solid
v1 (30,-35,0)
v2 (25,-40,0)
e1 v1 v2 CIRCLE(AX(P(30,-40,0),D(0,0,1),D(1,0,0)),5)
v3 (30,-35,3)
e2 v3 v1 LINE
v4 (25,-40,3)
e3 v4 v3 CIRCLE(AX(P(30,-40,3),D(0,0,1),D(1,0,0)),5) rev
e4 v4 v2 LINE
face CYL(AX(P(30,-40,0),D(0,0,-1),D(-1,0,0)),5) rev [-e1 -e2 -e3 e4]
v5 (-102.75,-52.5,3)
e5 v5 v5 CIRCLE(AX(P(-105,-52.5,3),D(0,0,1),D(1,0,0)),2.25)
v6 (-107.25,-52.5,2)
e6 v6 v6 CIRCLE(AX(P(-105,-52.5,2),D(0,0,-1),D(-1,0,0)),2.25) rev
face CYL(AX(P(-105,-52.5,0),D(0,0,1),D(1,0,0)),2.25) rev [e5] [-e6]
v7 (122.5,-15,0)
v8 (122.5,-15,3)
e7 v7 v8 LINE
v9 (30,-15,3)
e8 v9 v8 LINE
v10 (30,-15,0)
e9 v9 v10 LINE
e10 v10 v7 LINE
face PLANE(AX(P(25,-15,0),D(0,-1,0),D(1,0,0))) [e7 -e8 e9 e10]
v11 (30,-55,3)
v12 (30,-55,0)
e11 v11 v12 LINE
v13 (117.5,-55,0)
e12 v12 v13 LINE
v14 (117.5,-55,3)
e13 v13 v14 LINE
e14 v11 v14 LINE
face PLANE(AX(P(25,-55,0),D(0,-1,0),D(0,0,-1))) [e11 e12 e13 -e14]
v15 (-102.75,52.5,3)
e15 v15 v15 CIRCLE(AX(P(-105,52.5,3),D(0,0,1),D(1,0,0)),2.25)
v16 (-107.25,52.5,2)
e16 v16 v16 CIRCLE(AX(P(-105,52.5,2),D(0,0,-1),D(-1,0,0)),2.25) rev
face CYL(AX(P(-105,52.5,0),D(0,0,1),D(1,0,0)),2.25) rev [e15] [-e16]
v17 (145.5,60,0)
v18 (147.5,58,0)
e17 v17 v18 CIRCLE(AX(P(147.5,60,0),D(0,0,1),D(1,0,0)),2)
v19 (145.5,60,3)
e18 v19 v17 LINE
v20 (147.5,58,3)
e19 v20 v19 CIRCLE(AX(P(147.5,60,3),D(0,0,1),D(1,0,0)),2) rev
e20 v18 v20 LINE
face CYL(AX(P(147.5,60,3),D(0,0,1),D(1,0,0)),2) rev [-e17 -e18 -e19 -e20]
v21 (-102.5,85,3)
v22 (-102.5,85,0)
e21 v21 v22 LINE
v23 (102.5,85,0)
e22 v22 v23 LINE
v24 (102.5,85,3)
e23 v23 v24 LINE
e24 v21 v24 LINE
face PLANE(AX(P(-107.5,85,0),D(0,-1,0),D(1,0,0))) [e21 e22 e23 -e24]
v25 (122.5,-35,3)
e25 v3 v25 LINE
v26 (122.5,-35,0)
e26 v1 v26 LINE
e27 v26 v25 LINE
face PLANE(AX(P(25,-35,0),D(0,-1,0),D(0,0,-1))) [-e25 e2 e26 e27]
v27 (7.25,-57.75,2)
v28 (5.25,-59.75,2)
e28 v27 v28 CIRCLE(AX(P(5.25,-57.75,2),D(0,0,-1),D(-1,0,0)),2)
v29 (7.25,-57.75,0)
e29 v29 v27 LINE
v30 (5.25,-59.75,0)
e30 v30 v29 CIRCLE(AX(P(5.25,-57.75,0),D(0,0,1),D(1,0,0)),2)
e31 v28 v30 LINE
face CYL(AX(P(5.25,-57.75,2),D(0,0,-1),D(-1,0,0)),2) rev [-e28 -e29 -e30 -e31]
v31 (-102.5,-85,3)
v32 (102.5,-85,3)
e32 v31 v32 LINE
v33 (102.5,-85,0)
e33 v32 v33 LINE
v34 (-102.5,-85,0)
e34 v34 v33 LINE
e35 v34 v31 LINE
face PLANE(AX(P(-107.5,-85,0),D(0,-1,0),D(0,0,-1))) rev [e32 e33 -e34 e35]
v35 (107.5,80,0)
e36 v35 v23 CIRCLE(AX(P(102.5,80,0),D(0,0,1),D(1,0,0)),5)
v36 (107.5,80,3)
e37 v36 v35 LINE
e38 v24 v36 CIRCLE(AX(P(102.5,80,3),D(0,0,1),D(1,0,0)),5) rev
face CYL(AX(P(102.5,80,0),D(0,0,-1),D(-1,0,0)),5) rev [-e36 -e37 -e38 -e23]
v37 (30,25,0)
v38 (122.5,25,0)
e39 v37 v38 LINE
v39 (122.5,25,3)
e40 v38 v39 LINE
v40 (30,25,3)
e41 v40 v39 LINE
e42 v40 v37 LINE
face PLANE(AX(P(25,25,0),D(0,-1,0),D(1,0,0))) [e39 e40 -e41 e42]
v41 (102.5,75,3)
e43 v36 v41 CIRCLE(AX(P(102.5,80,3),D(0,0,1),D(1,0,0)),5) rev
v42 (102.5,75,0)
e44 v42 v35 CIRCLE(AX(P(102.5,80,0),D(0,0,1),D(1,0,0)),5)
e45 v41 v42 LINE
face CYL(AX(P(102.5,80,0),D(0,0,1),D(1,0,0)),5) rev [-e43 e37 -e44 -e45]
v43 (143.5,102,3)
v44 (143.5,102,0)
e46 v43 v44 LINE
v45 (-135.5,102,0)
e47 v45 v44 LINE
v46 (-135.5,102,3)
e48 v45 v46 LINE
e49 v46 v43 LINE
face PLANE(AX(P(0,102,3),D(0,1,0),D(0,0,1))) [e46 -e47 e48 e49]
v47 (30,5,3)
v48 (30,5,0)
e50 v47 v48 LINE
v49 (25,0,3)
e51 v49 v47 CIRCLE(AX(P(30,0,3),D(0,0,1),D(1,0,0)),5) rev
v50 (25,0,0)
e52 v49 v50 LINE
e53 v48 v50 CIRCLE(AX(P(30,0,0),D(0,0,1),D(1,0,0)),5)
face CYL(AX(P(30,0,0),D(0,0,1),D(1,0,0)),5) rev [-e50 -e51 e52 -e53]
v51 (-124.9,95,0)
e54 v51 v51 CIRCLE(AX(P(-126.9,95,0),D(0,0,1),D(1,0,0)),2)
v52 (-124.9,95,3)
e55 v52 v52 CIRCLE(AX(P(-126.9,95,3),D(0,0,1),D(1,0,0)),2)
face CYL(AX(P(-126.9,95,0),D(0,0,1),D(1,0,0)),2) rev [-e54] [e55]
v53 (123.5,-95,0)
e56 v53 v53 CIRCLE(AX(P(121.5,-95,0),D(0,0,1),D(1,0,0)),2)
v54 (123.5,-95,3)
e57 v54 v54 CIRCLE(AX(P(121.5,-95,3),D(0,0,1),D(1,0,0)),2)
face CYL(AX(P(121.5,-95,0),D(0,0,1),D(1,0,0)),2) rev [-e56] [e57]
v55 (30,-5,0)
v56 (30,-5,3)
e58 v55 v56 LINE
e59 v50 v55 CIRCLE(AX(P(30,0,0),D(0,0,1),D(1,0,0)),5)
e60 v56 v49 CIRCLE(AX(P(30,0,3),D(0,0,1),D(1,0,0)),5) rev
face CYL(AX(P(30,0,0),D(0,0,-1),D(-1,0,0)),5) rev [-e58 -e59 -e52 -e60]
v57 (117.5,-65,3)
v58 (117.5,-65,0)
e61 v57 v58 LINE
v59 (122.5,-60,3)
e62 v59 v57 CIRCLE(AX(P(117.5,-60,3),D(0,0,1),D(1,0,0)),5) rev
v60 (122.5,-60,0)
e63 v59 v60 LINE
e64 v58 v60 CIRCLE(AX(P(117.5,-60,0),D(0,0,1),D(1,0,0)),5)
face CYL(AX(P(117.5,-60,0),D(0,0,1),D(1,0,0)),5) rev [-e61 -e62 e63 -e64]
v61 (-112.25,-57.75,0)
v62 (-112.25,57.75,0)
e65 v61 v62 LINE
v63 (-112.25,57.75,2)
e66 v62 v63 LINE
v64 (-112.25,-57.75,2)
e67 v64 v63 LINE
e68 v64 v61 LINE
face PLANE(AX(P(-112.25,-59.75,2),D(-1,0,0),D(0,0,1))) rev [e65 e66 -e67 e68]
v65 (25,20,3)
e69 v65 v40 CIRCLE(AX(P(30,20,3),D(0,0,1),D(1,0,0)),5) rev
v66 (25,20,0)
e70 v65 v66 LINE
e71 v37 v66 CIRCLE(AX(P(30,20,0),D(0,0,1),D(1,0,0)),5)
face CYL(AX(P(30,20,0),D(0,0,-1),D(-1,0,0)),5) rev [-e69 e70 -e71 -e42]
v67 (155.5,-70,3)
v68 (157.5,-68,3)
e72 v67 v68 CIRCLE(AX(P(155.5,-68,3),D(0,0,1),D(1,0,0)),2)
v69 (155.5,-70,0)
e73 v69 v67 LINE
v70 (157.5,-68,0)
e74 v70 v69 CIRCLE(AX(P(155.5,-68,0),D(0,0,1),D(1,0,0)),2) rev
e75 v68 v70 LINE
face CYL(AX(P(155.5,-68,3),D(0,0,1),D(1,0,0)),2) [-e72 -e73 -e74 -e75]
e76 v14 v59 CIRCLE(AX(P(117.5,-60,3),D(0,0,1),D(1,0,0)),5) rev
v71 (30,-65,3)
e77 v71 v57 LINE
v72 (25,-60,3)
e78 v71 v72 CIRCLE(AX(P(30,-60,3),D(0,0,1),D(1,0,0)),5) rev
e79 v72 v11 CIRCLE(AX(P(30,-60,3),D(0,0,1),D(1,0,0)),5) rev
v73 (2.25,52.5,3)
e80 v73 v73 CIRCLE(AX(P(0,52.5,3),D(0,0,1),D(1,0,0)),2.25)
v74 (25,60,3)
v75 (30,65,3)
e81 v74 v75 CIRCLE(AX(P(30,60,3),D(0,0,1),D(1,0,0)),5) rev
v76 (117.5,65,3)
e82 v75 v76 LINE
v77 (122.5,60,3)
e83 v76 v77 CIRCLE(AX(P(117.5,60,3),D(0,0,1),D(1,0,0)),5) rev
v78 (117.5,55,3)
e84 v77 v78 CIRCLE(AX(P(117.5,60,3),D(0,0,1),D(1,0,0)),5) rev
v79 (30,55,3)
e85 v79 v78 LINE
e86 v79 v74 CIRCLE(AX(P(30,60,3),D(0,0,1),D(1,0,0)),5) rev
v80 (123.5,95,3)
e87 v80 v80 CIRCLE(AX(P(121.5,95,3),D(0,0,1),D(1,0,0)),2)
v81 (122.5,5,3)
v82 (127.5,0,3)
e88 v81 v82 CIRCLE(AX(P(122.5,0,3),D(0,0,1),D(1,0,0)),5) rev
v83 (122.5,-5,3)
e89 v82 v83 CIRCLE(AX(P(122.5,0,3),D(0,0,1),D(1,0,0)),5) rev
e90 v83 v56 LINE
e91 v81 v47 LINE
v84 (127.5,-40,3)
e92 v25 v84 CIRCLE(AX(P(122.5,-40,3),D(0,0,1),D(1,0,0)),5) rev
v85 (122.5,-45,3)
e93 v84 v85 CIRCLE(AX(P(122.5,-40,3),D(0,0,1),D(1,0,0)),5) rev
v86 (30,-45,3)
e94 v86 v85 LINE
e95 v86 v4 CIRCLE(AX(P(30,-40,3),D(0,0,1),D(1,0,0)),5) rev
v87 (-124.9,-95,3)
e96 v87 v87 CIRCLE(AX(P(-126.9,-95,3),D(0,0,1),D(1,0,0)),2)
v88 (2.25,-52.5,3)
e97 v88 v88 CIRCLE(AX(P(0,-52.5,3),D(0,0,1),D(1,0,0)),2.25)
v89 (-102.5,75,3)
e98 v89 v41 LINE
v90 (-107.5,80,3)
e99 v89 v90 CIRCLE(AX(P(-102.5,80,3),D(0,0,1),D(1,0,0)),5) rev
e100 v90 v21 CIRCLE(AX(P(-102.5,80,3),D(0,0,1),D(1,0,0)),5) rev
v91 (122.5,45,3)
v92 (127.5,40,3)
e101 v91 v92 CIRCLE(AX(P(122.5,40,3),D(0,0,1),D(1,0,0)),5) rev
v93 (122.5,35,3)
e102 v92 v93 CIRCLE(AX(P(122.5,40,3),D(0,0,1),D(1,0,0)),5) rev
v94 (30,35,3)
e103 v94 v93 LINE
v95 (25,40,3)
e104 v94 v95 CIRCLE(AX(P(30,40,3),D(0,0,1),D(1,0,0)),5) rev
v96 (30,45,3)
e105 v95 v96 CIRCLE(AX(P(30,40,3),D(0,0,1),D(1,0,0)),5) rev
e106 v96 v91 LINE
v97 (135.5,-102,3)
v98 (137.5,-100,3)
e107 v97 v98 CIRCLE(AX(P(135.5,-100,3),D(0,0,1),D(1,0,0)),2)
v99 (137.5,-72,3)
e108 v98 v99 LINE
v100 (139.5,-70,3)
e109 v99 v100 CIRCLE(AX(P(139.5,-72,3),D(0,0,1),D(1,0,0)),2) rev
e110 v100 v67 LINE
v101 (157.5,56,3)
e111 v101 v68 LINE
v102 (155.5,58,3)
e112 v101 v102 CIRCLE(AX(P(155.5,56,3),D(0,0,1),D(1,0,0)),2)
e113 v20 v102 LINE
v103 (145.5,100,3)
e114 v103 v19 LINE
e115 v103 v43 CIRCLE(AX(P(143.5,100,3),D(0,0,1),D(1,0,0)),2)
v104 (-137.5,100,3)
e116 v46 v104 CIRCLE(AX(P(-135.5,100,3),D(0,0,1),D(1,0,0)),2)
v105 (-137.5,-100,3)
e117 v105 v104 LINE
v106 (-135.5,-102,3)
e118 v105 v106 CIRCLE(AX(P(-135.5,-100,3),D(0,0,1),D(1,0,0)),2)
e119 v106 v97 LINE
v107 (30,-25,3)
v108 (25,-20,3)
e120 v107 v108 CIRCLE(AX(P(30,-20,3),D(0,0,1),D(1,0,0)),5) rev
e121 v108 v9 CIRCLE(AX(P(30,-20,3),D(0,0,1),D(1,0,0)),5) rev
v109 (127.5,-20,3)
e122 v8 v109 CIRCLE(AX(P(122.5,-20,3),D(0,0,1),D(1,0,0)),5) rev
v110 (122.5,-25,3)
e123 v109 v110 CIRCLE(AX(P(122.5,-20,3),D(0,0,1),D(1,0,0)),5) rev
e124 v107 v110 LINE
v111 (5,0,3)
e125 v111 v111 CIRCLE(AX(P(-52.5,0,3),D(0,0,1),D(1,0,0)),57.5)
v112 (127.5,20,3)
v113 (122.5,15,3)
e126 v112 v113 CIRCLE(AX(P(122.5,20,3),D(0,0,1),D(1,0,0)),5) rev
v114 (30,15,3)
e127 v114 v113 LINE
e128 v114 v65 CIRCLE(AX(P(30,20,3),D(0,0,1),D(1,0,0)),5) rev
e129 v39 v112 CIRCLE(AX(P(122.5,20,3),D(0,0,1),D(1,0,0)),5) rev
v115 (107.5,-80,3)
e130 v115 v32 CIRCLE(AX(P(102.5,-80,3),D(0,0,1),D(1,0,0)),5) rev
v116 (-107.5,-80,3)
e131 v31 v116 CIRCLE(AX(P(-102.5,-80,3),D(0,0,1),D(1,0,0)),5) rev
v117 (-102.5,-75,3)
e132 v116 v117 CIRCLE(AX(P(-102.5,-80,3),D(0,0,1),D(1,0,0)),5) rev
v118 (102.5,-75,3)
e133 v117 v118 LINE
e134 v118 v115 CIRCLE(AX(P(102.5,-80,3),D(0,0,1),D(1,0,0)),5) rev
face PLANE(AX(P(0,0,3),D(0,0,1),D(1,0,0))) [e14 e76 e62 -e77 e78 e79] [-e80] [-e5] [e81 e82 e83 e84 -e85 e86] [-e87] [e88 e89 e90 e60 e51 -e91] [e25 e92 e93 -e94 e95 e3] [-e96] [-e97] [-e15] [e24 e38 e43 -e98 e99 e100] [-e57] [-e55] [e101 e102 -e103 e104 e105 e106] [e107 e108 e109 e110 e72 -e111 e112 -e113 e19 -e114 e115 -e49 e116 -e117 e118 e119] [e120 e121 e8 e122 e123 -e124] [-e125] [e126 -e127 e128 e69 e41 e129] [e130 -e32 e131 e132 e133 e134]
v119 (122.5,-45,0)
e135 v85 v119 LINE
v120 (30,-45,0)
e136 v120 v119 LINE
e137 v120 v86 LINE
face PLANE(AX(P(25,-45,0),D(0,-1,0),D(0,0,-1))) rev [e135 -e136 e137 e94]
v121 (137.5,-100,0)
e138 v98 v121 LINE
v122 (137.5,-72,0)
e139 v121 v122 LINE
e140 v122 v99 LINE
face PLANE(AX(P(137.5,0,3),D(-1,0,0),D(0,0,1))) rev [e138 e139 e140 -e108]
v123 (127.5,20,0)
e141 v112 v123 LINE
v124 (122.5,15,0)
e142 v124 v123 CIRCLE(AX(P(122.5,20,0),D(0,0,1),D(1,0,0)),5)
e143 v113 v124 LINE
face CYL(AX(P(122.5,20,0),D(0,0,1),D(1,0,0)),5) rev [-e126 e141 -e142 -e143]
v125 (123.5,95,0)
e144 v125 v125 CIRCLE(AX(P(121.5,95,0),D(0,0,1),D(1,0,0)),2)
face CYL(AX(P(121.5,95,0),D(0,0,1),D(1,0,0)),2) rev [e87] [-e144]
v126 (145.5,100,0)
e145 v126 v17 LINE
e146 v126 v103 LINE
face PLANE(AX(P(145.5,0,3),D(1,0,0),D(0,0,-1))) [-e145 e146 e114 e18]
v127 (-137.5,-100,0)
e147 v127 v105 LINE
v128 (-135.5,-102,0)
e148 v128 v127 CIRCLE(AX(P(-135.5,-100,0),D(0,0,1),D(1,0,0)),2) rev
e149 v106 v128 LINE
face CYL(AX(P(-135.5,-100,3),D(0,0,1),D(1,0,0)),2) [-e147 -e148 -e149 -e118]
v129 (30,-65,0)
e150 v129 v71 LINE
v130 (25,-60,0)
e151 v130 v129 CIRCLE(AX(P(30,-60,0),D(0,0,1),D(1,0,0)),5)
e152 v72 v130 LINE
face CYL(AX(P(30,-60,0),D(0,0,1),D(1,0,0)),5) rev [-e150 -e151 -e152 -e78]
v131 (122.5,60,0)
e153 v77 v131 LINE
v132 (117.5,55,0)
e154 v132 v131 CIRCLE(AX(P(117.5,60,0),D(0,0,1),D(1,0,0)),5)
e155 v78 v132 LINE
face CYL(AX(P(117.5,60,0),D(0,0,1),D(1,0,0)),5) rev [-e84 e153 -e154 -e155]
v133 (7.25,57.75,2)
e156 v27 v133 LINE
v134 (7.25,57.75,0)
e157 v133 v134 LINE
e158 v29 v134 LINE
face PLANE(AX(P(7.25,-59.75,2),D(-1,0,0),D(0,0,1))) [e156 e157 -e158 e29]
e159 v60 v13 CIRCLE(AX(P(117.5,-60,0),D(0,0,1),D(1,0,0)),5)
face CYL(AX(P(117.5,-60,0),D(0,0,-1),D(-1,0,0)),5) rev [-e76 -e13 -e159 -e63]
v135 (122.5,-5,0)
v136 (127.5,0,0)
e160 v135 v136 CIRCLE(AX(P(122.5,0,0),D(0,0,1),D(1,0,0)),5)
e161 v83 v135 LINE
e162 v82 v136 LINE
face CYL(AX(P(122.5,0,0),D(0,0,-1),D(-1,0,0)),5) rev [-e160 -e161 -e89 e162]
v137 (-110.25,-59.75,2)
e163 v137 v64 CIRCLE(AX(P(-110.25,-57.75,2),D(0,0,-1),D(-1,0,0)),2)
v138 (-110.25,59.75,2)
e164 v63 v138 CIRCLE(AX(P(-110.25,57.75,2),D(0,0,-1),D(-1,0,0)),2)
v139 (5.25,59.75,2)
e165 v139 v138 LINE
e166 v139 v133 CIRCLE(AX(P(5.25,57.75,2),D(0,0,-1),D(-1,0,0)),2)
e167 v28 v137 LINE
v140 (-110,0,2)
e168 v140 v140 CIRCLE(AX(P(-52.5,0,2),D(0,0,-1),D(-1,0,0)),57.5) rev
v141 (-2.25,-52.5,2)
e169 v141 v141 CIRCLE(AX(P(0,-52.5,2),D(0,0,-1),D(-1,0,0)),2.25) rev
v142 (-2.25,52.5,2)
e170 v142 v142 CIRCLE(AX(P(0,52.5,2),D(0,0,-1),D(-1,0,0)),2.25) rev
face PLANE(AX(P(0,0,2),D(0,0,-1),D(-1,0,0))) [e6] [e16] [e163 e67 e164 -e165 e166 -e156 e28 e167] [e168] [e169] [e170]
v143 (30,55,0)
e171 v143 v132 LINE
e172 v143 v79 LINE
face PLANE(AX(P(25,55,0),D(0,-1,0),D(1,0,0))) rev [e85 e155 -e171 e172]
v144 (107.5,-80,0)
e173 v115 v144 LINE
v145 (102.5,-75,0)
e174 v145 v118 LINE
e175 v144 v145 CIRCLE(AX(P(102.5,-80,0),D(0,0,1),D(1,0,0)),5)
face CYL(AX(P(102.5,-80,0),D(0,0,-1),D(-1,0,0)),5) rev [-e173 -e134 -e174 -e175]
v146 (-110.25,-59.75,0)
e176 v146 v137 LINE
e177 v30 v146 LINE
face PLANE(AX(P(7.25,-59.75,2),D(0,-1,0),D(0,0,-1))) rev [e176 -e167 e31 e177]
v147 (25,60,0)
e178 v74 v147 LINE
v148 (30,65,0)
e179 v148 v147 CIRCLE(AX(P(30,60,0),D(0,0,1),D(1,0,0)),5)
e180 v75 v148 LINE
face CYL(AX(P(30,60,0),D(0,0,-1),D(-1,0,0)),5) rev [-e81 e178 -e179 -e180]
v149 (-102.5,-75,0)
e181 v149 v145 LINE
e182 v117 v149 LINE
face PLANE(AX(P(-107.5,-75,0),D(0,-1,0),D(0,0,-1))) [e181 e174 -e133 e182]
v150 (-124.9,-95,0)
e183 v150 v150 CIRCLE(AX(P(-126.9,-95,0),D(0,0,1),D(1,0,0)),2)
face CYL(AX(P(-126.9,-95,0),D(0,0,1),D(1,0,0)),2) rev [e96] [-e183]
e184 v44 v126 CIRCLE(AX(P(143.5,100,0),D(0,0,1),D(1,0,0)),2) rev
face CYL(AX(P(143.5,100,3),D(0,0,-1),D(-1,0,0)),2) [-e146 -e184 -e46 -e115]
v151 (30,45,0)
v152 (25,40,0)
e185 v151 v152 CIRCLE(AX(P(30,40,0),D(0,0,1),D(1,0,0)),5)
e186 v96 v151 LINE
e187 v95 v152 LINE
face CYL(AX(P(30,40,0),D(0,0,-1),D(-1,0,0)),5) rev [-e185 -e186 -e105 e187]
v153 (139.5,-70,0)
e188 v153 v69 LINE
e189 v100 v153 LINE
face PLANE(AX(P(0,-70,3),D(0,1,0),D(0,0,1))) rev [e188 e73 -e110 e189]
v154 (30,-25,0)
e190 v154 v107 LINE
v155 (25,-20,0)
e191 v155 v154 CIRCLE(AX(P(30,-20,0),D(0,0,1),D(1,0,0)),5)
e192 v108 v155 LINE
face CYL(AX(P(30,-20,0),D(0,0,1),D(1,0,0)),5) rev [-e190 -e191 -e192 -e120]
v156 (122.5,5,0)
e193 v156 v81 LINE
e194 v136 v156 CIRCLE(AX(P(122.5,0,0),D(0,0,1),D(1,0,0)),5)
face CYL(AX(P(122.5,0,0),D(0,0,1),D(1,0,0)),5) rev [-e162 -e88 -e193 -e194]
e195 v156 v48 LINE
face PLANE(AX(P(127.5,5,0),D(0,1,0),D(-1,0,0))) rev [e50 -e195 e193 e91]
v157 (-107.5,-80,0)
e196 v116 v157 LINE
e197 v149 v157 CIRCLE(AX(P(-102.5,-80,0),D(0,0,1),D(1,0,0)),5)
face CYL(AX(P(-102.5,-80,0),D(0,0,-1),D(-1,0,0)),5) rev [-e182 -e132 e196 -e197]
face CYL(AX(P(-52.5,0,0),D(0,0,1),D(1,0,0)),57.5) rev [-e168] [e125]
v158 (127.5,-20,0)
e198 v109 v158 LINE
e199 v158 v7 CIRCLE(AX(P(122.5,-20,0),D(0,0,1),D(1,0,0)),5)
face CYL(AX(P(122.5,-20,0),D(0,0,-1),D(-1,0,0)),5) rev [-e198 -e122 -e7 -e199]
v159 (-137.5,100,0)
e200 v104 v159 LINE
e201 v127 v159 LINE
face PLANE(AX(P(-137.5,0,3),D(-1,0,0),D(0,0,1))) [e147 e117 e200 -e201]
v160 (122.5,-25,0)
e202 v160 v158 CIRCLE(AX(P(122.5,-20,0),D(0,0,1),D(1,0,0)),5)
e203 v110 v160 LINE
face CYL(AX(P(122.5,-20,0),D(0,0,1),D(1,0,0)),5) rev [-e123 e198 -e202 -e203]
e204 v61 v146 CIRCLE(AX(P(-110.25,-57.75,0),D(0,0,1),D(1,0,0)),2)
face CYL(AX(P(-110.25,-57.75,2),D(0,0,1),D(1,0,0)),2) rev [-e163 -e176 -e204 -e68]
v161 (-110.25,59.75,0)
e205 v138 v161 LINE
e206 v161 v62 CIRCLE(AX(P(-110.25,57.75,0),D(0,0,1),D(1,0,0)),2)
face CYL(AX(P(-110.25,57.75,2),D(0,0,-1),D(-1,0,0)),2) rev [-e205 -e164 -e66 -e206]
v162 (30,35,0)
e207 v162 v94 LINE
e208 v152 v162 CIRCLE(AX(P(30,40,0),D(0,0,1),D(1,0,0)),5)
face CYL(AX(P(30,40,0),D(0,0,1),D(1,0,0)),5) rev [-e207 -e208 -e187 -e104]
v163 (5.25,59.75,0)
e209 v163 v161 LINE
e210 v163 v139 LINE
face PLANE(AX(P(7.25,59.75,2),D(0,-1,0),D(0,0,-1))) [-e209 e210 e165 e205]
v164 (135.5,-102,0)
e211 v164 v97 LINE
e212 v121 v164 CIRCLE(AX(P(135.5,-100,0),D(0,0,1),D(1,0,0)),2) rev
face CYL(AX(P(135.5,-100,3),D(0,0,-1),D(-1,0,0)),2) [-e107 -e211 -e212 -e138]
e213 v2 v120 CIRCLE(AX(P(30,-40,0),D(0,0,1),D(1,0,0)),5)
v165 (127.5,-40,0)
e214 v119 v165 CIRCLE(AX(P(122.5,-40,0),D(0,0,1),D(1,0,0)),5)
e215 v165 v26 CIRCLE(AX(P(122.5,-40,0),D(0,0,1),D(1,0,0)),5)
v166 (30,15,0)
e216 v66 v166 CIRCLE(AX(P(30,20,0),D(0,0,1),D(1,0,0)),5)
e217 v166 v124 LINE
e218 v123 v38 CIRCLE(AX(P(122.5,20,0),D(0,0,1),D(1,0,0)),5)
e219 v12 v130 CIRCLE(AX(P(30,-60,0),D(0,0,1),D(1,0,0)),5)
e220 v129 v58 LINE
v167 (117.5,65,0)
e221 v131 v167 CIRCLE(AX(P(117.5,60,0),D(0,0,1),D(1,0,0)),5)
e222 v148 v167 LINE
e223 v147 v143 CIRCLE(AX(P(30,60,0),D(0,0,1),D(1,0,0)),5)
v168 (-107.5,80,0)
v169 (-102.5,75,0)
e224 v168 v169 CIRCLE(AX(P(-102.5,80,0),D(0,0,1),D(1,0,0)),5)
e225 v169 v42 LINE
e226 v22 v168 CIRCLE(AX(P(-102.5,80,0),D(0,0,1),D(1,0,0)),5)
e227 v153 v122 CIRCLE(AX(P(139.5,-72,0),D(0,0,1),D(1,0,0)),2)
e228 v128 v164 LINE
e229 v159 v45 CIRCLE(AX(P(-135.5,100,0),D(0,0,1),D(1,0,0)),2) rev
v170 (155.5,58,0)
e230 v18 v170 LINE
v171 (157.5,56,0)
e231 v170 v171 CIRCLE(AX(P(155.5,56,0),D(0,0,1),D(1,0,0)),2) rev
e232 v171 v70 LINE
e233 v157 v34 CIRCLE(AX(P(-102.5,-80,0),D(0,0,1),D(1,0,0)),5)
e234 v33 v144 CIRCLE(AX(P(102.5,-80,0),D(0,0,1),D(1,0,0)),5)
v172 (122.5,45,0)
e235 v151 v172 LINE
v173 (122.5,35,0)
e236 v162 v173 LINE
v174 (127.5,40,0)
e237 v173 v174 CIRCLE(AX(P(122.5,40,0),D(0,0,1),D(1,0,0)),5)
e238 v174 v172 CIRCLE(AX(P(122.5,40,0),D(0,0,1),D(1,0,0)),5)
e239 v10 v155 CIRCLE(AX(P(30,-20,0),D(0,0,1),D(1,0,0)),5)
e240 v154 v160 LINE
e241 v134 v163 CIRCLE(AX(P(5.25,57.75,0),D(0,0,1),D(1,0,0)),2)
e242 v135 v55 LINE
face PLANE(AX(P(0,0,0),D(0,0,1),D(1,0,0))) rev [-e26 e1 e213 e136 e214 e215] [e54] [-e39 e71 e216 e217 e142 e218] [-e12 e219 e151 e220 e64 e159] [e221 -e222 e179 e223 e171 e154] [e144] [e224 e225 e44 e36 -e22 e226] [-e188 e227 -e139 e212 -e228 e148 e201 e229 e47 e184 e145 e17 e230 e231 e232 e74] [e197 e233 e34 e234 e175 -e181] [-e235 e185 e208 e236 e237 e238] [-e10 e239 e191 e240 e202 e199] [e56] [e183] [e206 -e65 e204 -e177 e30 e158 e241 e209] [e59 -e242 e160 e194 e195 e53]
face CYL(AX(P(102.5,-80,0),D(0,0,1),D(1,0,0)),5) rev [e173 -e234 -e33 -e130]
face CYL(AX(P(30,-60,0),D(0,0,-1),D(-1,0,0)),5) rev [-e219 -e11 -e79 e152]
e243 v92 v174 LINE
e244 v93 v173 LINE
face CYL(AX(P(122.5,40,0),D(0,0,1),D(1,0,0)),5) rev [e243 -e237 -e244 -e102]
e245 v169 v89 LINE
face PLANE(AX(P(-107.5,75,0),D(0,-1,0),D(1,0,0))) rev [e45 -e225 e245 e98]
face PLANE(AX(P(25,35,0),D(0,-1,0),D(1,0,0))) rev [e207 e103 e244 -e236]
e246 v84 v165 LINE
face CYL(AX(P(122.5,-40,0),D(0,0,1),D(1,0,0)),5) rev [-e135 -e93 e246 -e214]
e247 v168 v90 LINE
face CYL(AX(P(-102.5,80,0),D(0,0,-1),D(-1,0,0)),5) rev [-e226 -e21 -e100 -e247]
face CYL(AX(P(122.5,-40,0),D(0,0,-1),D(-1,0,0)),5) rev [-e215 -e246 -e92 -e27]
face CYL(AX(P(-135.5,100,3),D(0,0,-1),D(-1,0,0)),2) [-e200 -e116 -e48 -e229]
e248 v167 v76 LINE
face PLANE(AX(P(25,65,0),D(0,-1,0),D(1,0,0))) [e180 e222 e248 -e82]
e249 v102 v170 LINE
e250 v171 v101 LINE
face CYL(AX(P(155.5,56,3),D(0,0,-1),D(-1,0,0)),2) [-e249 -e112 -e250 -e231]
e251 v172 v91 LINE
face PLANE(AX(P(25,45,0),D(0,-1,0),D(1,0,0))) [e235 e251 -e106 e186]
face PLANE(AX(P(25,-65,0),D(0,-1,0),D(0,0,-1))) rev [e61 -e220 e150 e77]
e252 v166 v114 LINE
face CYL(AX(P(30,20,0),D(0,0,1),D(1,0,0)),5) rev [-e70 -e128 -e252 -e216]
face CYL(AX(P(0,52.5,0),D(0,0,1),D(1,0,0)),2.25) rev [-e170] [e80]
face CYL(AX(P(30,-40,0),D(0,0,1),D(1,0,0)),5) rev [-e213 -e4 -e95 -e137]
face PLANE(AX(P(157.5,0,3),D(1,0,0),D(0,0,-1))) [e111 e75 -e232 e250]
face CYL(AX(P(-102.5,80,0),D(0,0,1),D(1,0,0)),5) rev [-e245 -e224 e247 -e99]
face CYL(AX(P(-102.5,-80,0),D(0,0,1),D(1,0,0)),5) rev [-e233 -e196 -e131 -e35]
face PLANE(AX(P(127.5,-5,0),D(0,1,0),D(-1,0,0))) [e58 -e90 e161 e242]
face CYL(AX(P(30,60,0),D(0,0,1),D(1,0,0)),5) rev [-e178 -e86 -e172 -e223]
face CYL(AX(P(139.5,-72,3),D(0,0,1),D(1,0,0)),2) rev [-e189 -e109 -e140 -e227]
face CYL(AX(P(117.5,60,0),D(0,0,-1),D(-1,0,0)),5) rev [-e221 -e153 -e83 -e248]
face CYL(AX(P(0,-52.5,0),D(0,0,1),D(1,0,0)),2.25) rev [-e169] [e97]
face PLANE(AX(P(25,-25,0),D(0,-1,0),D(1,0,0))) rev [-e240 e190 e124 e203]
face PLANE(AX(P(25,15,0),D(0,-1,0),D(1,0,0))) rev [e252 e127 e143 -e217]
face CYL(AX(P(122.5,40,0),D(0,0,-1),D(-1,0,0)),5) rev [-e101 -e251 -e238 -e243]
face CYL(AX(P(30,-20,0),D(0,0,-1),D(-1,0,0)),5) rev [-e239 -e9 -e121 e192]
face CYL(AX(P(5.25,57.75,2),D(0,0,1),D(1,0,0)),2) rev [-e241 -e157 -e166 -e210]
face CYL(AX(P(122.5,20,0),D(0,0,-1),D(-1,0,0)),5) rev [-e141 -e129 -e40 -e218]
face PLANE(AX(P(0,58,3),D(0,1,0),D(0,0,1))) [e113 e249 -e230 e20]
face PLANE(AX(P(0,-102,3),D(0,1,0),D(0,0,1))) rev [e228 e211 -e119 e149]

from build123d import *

# Parameters (mm, degrees)
SKETCH_1_W            = 275
SKETCH_1_H            = 204
SKETCH_1_W_2          = 8
SKETCH_1_H_2          = 44
EXTRUDE_1_DEPTH       = 3
SKETCH_2_R            = 2
SKETCH_2_R_2          = 57.5
SKETCH_2_R_3          = 2.25
CUT_EXTRUDE_1_DEPTH   = 3
SKETCH_3_W            = 119.5
SKETCH_3_H            = 119.5
CUT_EXTRUDE_2_DEPTH   = 2
FILLET_1_R            = 2
SKETCH_5_W            = 215
SKETCH_5_H            = 10
SKETCH_5_W_2          = 97.5
SKETCH_5_W_3          = 102.5
CUT_EXTRUDE_1_2_DEPTH = 3
FILLET_2_R            = 5
FILLET_3_R            = 2


with BuildPart() as part:
    # 스케치1 → 보스-돌출1 (new body)
    with BuildSketch(Plane.XY):
        Rectangle(SKETCH_1_W, SKETCH_1_H)
        Polygon((137.5, 58), (137.5, -70), (157.5, -70), (157.5, 58), (145.5, 58), align=None)
        with Locations((141.5, 80)):
            Rectangle(SKETCH_1_W_2, SKETCH_1_H_2)
    extrude(amount=EXTRUDE_1_DEPTH)

    # 스케치2 → Cut-Extrude 1 (cut)
    with BuildSketch(Plane.XY.offset(3)):
        with Locations((-126.9, 95)):
            Circle(SKETCH_2_R)
        with Locations((121.5, 95)):
            Circle(SKETCH_2_R)
        with Locations((-126.9, -95)):
            Circle(SKETCH_2_R)
        with Locations((121.5, -95)):
            Circle(SKETCH_2_R)
        with Locations((-52.5, 0)):
            Circle(SKETCH_2_R_2)
        with Locations((-105, 52.5)):
            Circle(SKETCH_2_R_3)
        with Locations((0, 52.5)):
            Circle(SKETCH_2_R_3)
        with Locations((0, -52.5)):
            Circle(SKETCH_2_R_3)
        with Locations((-105, -52.5)):
            Circle(SKETCH_2_R_3)
    extrude(amount=-CUT_EXTRUDE_1_DEPTH, mode=Mode.SUBTRACT)

    # 스케치3 → 컷-돌출2 (cut)
    with BuildSketch(Plane(origin=(0, 0, 0), x_dir=(-1, 0, 0), z_dir=(0, 0, -1))):
        with Locations((52.5, 0)):
            Rectangle(SKETCH_3_W, SKETCH_3_H)
    extrude(amount=-CUT_EXTRUDE_2_DEPTH, mode=Mode.SUBTRACT)

    # 필렛1
    fillet_1_edges = [part.edges().sort_by_distance(p)[0] for p in [
        (7.25, 59.75, 1),
        (-112.25, 59.75, 1),
        (-112.25, -59.75, 1),
        (7.25, -59.75, 1),
    ]]
    fillet(fillet_1_edges, radius=FILLET_1_R)

    # 스케치5 → Cut-Extrude 1 2 (cut)
    with BuildSketch(Plane.XY.offset(3)):
        with Locations((0, -80)):
            Rectangle(SKETCH_5_W, SKETCH_5_H)
        with Locations((73.75, -60)):
            Rectangle(SKETCH_5_W_2, SKETCH_5_H)
        with Locations((76.25, -40)):
            Rectangle(SKETCH_5_W_3, SKETCH_5_H)
        with Locations((76.25, -20)):
            Rectangle(SKETCH_5_W_3, SKETCH_5_H)
        with Locations((76.25, 0)):
            Rectangle(SKETCH_5_W_3, SKETCH_5_H)
        with Locations((76.25, 20)):
            Rectangle(SKETCH_5_W_3, SKETCH_5_H)
        with Locations((76.25, 40)):
            Rectangle(SKETCH_5_W_3, SKETCH_5_H)
        with Locations((73.75, 60)):
            Rectangle(SKETCH_5_W_2, SKETCH_5_H)
        with Locations((0, 80)):
            Rectangle(SKETCH_5_W, SKETCH_5_H)
    extrude(amount=-CUT_EXTRUDE_1_2_DEPTH, mode=Mode.SUBTRACT)

    # 필렛2
    fillet_2_edges = [part.edges().sort_by_distance(p)[0] for p in [
        (107.5, -85, 1.5),
        (122.5, -65, 1.5),
        (127.5, -45, 1.5),
        (127.5, -25, 1.5),
        (127.5, -5, 1.5),
        (127.5, 15, 1.5),
        (127.5, 35, 1.5),
        (122.5, 55, 1.5),
        (107.5, 75, 1.5),
        (25, 65, 1.5),
        (25, 45, 1.5),
        (25, 25, 1.5),
        (25, 5, 1.5),
        (25, -15, 1.5),
        (25, -35, 1.5),
        (25, -55, 1.5),
        (-107.5, -75, 1.5),
        (25, -65, 1.5),
        (25, -45, 1.5),
        (25, -25, 1.5),
        (25, -5, 1.5),
        (25, 15, 1.5),
        (25, 35, 1.5),
        (25, 55, 1.5),
        (-107.5, -85, 1.5),
        (127.5, 5, 1.5),
        (127.5, -15, 1.5),
        (127.5, -35, 1.5),
        (122.5, -55, 1.5),
        (107.5, -75, 1.5),
        (127.5, 25, 1.5),
        (122.5, 65, 1.5),
        (127.5, 45, 1.5),
        (107.5, 85, 1.5),
        (-107.5, 75, 1.5),
        (-107.5, 85, 1.5),
    ]]
    fillet(fillet_2_edges, radius=FILLET_2_R - 0.0001)  # a hair under: the kernel refuses the full size

    # 필렛3
    fillet_3_edges = [part.edges().sort_by_distance(p)[0] for p in [
        (157.5, 58, 1.5),
        (157.5, -70, 1.5),
        (137.5, -70, 1.5),
        (137.5, -102, 1.5),
        (-137.5, -102, 1.5),
        (-137.5, 102, 1.5),
        (145.5, 102, 1.5),
        (145.5, 58, 1.5),
    ]]
    fillet(fillet_3_edges, radius=FILLET_3_R)


solid = part.part
